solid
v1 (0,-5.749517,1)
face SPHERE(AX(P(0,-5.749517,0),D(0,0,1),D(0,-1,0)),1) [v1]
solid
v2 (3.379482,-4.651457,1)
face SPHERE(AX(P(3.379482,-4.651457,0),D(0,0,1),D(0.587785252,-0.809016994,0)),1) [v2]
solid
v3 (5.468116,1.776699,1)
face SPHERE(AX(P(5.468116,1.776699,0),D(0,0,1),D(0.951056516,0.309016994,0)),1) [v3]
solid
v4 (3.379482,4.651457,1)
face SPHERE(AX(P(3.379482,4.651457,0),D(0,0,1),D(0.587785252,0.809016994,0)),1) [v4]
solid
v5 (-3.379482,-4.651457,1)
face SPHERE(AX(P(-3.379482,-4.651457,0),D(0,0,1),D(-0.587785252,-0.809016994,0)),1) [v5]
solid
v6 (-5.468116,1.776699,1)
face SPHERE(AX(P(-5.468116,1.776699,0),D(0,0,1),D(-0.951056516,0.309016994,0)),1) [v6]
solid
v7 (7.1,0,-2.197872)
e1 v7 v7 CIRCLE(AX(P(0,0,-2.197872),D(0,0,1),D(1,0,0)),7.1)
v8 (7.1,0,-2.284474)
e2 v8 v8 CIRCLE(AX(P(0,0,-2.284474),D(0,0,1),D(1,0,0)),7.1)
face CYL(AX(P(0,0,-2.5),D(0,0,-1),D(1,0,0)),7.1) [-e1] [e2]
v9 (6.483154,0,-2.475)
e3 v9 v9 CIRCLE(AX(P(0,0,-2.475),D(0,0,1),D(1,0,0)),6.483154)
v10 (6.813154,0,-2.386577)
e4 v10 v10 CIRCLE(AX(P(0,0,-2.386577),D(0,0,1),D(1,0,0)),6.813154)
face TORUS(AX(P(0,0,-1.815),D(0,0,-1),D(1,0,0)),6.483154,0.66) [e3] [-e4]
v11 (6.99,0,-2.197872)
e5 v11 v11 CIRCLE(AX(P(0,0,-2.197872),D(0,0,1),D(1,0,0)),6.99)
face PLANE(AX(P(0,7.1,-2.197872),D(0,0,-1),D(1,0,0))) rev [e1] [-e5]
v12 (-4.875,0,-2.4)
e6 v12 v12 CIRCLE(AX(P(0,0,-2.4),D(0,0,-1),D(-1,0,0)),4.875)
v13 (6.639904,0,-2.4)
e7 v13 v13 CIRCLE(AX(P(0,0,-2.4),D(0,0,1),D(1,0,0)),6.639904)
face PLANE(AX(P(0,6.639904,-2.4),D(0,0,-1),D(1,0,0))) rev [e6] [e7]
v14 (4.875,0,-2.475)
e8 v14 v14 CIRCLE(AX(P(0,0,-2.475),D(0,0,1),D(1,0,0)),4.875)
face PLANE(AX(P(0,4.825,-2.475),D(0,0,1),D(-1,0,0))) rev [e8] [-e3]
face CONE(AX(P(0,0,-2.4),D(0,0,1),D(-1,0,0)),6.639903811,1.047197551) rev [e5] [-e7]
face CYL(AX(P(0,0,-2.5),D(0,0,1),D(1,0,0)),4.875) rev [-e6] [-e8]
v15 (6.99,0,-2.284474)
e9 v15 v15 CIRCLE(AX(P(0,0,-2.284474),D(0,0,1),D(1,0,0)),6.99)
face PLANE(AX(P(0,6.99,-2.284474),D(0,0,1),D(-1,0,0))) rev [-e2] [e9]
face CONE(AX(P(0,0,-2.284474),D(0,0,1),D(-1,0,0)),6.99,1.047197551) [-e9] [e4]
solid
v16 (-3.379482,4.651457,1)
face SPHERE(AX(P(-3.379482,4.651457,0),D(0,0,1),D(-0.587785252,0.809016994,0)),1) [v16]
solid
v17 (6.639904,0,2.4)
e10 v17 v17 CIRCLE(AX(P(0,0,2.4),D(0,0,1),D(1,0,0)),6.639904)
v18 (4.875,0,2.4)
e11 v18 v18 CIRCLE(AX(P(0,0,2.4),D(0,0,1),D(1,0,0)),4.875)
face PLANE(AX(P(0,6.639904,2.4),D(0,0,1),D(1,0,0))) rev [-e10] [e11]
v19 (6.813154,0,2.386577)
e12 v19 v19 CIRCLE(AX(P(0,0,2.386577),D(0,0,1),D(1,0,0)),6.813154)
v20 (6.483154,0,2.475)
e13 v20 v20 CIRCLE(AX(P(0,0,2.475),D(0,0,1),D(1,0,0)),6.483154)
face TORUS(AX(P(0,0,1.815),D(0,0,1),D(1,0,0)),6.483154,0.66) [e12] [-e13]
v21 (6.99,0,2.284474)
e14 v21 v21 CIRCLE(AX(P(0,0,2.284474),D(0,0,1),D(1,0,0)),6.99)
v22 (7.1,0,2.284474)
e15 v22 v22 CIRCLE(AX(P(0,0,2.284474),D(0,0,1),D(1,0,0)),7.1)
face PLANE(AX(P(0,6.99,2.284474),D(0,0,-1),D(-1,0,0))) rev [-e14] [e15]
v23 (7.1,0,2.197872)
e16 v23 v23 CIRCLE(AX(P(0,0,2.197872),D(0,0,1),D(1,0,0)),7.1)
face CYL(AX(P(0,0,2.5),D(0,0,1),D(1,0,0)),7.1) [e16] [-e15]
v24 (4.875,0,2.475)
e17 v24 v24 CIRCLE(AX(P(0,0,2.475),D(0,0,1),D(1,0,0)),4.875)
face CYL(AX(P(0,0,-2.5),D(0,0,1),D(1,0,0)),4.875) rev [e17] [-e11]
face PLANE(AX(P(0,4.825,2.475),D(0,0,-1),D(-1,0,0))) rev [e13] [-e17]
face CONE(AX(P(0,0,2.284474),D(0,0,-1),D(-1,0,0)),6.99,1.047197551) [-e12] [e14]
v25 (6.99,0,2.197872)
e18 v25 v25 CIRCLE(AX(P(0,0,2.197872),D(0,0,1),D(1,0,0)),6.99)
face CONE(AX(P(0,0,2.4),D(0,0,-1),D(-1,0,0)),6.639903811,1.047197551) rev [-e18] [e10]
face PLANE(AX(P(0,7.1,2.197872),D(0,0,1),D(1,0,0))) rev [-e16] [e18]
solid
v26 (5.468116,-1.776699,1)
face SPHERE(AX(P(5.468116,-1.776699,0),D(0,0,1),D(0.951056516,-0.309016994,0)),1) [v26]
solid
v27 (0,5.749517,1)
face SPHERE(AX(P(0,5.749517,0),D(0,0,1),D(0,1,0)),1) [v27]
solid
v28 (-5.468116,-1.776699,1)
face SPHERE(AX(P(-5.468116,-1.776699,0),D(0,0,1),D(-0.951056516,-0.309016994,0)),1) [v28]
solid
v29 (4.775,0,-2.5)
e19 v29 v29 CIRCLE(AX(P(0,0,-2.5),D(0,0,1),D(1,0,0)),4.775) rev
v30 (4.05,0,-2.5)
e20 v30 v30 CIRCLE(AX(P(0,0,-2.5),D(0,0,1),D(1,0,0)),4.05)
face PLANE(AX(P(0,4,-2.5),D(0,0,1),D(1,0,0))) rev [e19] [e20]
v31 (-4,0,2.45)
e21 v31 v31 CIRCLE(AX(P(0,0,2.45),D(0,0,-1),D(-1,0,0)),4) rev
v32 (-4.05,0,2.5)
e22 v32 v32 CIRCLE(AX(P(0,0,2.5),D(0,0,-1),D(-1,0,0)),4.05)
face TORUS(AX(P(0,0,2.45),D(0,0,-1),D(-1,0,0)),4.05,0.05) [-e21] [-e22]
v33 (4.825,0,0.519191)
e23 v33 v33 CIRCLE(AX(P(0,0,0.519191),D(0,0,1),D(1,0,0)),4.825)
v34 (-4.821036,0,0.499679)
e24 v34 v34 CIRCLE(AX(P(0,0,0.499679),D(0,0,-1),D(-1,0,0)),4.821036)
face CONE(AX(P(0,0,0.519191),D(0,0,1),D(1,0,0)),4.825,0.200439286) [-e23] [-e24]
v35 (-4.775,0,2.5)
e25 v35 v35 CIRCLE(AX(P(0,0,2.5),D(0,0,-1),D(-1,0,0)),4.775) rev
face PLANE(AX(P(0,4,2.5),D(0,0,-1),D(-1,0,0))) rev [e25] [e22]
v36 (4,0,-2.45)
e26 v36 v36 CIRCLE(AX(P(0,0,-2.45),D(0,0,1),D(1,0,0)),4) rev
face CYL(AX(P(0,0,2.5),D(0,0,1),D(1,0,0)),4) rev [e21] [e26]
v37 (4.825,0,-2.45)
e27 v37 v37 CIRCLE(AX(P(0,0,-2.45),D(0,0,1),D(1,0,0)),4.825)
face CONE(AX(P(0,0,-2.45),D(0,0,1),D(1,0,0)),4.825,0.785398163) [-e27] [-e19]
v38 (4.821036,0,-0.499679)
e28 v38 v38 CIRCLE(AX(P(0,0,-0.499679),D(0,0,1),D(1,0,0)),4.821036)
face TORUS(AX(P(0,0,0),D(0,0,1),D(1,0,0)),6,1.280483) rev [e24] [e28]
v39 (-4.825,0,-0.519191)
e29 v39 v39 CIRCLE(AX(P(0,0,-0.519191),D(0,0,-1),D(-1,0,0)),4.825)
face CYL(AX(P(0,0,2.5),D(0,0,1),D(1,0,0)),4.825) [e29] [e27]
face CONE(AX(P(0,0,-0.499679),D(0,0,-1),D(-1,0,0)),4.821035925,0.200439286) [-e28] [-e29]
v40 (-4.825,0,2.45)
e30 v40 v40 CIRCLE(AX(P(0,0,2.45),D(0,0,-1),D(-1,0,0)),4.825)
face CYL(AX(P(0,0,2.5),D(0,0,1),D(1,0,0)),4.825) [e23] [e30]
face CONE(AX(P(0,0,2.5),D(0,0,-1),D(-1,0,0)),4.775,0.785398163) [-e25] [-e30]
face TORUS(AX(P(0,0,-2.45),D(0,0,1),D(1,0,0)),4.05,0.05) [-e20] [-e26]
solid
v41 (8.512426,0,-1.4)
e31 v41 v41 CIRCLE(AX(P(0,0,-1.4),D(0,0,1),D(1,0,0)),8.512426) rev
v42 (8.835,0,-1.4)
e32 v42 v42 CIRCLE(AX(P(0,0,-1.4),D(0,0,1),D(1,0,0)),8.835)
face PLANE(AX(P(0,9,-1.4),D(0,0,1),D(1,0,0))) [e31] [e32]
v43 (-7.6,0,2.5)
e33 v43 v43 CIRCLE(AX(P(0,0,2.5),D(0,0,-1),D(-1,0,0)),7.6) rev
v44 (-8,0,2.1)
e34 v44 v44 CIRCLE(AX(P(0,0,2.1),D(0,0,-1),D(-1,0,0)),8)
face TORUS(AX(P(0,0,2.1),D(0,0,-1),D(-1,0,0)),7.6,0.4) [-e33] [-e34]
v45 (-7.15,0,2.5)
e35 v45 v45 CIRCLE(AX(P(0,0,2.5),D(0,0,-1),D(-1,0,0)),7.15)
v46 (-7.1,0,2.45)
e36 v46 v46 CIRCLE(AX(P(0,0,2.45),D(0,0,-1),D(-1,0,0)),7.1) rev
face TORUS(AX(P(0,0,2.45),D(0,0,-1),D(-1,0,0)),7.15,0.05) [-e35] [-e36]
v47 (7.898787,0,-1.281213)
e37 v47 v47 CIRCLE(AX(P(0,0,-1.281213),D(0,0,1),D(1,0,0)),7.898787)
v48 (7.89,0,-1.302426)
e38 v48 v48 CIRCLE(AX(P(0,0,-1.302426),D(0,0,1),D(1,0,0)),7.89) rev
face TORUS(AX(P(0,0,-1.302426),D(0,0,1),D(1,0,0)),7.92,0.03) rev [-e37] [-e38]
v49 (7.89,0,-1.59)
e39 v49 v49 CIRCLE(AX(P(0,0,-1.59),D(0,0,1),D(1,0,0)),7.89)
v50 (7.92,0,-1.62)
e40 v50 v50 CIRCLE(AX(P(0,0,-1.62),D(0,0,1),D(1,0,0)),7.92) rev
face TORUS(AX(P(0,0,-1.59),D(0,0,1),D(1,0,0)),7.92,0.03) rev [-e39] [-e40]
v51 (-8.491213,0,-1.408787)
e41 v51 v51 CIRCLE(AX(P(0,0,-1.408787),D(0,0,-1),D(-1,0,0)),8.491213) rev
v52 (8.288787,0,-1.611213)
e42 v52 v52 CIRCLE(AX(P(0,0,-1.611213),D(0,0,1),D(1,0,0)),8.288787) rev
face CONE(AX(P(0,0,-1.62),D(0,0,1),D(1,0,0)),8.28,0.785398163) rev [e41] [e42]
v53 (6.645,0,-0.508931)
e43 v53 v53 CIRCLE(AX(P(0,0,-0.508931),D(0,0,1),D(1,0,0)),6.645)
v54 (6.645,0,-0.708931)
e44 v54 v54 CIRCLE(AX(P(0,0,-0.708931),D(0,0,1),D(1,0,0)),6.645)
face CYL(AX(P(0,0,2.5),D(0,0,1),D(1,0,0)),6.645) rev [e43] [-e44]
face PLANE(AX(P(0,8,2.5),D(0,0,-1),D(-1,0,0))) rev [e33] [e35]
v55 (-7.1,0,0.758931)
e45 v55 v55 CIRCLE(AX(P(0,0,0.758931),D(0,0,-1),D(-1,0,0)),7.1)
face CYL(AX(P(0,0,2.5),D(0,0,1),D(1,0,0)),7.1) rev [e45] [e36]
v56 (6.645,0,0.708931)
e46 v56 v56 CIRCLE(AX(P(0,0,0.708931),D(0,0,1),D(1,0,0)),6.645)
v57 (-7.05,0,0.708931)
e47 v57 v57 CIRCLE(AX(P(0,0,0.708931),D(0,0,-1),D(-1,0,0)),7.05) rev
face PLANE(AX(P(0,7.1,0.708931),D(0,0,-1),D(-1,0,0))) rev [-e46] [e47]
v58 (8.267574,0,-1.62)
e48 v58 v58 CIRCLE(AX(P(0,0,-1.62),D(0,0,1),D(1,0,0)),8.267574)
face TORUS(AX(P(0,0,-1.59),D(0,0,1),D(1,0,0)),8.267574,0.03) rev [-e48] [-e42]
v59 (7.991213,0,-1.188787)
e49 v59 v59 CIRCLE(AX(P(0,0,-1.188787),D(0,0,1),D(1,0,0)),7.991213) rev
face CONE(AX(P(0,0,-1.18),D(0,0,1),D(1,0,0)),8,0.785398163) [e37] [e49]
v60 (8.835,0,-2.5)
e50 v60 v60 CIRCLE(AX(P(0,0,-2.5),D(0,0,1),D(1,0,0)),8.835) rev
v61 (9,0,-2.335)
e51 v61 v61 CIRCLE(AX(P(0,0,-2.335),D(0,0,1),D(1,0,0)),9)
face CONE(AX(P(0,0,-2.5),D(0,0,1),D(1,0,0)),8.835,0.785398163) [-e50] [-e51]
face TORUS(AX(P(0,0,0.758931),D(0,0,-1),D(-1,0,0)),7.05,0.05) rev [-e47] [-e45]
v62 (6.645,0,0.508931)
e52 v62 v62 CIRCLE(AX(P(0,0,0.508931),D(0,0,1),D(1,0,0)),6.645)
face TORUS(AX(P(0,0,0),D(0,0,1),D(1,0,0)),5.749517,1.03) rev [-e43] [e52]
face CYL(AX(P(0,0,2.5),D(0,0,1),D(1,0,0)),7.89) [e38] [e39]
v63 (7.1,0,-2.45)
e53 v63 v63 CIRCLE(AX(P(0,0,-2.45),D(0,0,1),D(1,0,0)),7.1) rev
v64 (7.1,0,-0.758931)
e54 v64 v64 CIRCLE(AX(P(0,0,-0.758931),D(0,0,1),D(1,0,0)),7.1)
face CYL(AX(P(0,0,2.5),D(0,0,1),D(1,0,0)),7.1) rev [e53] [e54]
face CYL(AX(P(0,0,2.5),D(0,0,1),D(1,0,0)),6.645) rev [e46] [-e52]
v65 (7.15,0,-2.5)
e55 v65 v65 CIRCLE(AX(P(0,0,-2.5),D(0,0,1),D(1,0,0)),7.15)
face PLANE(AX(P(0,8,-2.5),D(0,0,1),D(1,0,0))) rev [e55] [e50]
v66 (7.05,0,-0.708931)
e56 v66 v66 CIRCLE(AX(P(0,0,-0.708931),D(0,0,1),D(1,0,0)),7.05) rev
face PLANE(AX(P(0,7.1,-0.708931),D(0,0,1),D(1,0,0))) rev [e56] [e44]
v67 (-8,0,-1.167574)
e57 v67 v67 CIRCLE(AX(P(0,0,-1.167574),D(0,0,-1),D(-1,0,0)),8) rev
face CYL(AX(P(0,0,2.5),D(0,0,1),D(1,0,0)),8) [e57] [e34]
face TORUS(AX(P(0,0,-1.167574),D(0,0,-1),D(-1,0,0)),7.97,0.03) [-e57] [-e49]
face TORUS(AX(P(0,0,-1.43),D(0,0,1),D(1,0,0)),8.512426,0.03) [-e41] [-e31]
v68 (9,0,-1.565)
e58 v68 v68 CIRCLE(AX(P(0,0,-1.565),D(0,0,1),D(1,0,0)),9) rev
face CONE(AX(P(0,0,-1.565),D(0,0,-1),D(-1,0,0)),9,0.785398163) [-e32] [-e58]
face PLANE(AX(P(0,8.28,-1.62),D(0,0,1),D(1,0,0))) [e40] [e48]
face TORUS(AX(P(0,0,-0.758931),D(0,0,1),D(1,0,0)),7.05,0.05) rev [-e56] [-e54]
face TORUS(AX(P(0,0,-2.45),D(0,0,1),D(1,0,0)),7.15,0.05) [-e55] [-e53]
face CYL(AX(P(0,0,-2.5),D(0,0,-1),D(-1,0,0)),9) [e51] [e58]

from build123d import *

# Parameters (mm, degrees)
CIRPATTERN1_COUNT  = 10
SKETCH9_R          = 4.875
CUT_EXTRUDE1_DEPTH = 13.359232379
SKETCH7_W          = 1.1
SKETCH7_H          = 1.9
FILLET2_R          = 0.4
FILLET3_R          = 0.05
FILLET5_R          = 0.03
CHAMFER1_SIZE      = 0.165
FILLET7_R          = 0.05


with BuildPart() as part:
    # Sketch3 → Revolve1 (revolve)
    with BuildSketch(Plane(origin=(0, 0, 0), x_dir=(0, 0, -1), z_dir=(1, 0, 0)), mode=Mode.PRIVATE) as revolve1_sk:
        with BuildLine():
            Line((-2.5, 8), (-2.5, 7.1))
            Line((-2.5, 7.1), (-0.708931057, 7.1))
            Line((-0.708931057, 7.1), (-0.708931057, 6.645))
            Line((-0.708931057, 6.645), (-0.508931057, 6.645))
            ThreePointArc((-0.508931057, 6.645), (0, 6.779517348), (0.508931057, 6.645))
            Line((0.508931057, 6.645), (0.708931057, 6.645))
            Line((0.708931057, 6.645), (0.708931057, 7.1))
            Line((0.708931057, 7.1), (2.5, 7.1))
            Line((2.5, 7.1), (2.5, 8))
            Line((2.5, 8), (-2.5, 8))
        make_face()
        with BuildLine():
            Line((2.5, 4), (-2.5, 4))
            Line((-2.5, 4), (-2.5, 4.825))
            Line((-2.5, 4.825), (-0.508931057, 4.825))
            ThreePointArc((-0.508931057, 4.825), (0, 4.719517348), (0.508931057, 4.825))
            Line((0.508931057, 4.825), (2.5, 4.825))
            Line((2.5, 4.825), (2.5, 4))
        make_face()
    revolve(revolve1_sk.sketch.rotate(Axis((0, 0, 2.5), (0, 0, -1)), 90), axis=Axis((0, 0, 2.5), (0, 0, -1)))

    # Sketch7 → Revolve5 (revolve)
    with BuildSketch(Plane(origin=(0, 0, 0), x_dir=(0, 0, -1), z_dir=(1, 0, 0)), mode=Mode.PRIVATE) as revolve5_sk:
        with Locations((1.95, 8.05)):
            Rectangle(SKETCH7_W, SKETCH7_H)
    revolve(revolve5_sk.sketch.rotate(Axis((0, 0, -2.5), (0, 0, 1)), 270), axis=Axis((0, 0, -2.5), (0, 0, 1)))

    # Fillet2
    fillet2_edges = [part.edges().sort_by_distance(p)[0] for p in [
        (-8, 0, 2.5),
    ]]
    fillet(fillet2_edges, radius=FILLET2_R)

    # Fillet3
    fillet3_edges = [part.edges().sort_by_distance(p)[0] for p in [
        (-7.1, 0, 0.708931057),
        (-7.1, 0, 2.5),
        (-7.1, 0, -2.5),
        (-7.1, 0, -0.708931057),
    ]]
    fillet(fillet3_edges, radius=FILLET3_R)

    # Fillet6
    # the kernel refuses this chamfer: 0.05 mm, written as the material it takes off along each edge
    with BuildSketch(Plane(origin=(0, 0, 2.5), x_dir=(1, 0, 0), z_dir=(0, 1, 0))) as fillet6_piece_1:
        with BuildLine():
            Line((4.773585786, -0.001414214), (4.826414214, 0.051414214))
            Line((4.826414214, 0.051414214), (4.827414214, 0.051414214))
            ThreePointArc((4.827414214, 0.051414214), (4.826, 0.025707107), (4.826, 0))
            Line((4.826, 0), (4.825, -0.001))
            ThreePointArc((4.825, -0.001), (4.799292893, -0.001), (4.773585786, -0.002414214))
            Line((4.773585786, -0.002414214), (4.773585786, -0.001414214))
        make_face()
    revolve(axis=Axis((0, 0, 2.5), (0, 0, -1)), mode=Mode.SUBTRACT)
    with BuildSketch(Plane(origin=(0, 0, 0.508931057), x_dir=(1, 0, 0), z_dir=(0, 1, 0))) as fillet6_piece_2:
        with BuildLine():
            Line((4.8253982, -0.012219701), (4.820637726, 0.011211587))
            Line((4.820637726, 0.011211587), (4.821558444, 0.011601814))
            ThreePointArc((4.821558444, 0.011601814), (4.823542985, 0.005915405), (4.825917623, 0.000397453))
            Line((4.825917623, 0.000397453), (4.826, 0))
            ThreePointArc((4.826, 0), (4.826, -0.00610985), (4.8263982, -0.012219701))
            Line((4.8263982, -0.012219701), (4.8253982, -0.012219701))
        make_face()
    revolve(axis=Axis((0, 0, 0.508931057), (0, 0, -1)), mode=Mode.SUBTRACT)
    with BuildSketch(Plane(origin=(0, 0, -0.508931057), x_dir=(1, 0, 0), z_dir=(0, 1, 0))) as fillet6_piece_3:
        with BuildLine():
            Line((4.8253982, 0.012219701), (4.820637726, -0.011211587))
            Line((4.820637726, -0.011211587), (4.821558444, -0.011601814))
            ThreePointArc((4.821558444, -0.011601814), (4.823542985, -0.005915405), (4.825917623, -0.000397453))
            Line((4.825917623, -0.000397453), (4.826, 0))
            ThreePointArc((4.826, 0), (4.826, 0.00610985), (4.8263982, 0.012219701))
            Line((4.8263982, 0.012219701), (4.8253982, 0.012219701))
        make_face()
    revolve(axis=Axis((0, 0, -0.508931057), (0, 0, -1)), mode=Mode.SUBTRACT)
    with BuildSketch(Plane(origin=(0, 0, -2.5), x_dir=(1, 0, 0), z_dir=(0, 1, 0))) as fillet6_piece_4:
        with BuildLine():
            Line((4.826414214, -0.051414214), (4.773585786, 0.001414214))
            Line((4.773585786, 0.001414214), (4.773585786, 0.002414214))
            ThreePointArc((4.773585786, 0.002414214), (4.799292893, 0.001), (4.825, 0.001))
            Line((4.825, 0.001), (4.826, 0))
            ThreePointArc((4.826, 0), (4.826, -0.025707107), (4.827414214, -0.051414214))
            Line((4.827414214, -0.051414214), (4.826414214, -0.051414214))
        make_face()
    revolve(axis=Axis((0, 0, -2.5), (0, 0, -1)), mode=Mode.SUBTRACT)

    # Sketch8 → Cut-Revolve1 (revolve, cut)
    with BuildSketch(Plane(origin=(0, 0, 0), x_dir=(0, 0, -1), z_dir=(1, 0, 0)), mode=Mode.PRIVATE) as cut_revolve1_sk:
        Polygon((1.4, 8.5), (1.62, 8.28), (1.62, 7.89), (1.29, 7.89), (1.18, 8), (1.4, 8), align=None)
    revolve(cut_revolve1_sk.sketch.rotate(Axis((0, 0, 2.5), (0, 0, -1)), 270), axis=Axis((0, 0, 2.5), (0, 0, -1)), mode=Mode.SUBTRACT)

    # Fillet5
    fillet5_edges = [part.edges().sort_by_distance(p)[0] for p in [
        (8.5, 0, -1.4),
        (0, 8, -1.18),
        (7.89, 0, -1.29),
        (7.89, 0, -1.62),
        (8.28, 0, -1.62),
    ]]
    fillet(fillet5_edges, radius=FILLET5_R)

    # Chamfer1
    chamfer1_edges = [part.edges().sort_by_distance(p)[0] for p in [
        (-9, 0, -2.5),
        (-9, 0, -1.4),
    ]]
    chamfer(chamfer1_edges, length=CHAMFER1_SIZE)

    # Fillet7
    fillet7_edges = [part.edges().sort_by_distance(p)[0] for p in [
        (-4, 0, -2.5),
        (-4, 0, 2.5),
    ]]
    fillet(fillet7_edges, radius=FILLET7_R)


with BuildPart() as body_2:
    # Sketch5 → Revolve3 (revolve)
    with BuildSketch(Plane(origin=(0, 0, 0), x_dir=(0, 0, -1), z_dir=(1, 0, 0))):
        with BuildLine():
            Line((-1, 5.749517348), (1, 5.749517348))
            ThreePointArc((1, 5.749517348), (0, 6.749517348), (-1, 5.749517348))
        make_face()
    revolve(axis=Axis((0, 5.749517348, 1), (0, 0, -1)))


with BuildPart() as cirpattern1_1:
    # CirPattern1: pattern copy
    add(body_2.part.rotate(Axis((0, 0, 0), (0, 0, 1)), 1 * 360 / CIRPATTERN1_COUNT))


with BuildPart() as cirpattern1_2:
    # CirPattern1: pattern copy
    add(body_2.part.rotate(Axis((0, 0, 0), (0, 0, 1)), 2 * 360 / CIRPATTERN1_COUNT))


with BuildPart() as cirpattern1_3:
    # CirPattern1: pattern copy
    add(body_2.part.rotate(Axis((0, 0, 0), (0, 0, 1)), 3 * 360 / CIRPATTERN1_COUNT))


with BuildPart() as cirpattern1_4:
    # CirPattern1: pattern copy
    add(body_2.part.rotate(Axis((0, 0, 0), (0, 0, 1)), 4 * 360 / CIRPATTERN1_COUNT))


with BuildPart() as cirpattern1_5:
    # CirPattern1: pattern copy
    add(body_2.part.rotate(Axis((0, 0, 0), (0, 0, 1)), 5 * 360 / CIRPATTERN1_COUNT))


with BuildPart() as cirpattern1_6:
    # CirPattern1: pattern copy
    add(body_2.part.rotate(Axis((0, 0, 0), (0, 0, 1)), 6 * 360 / CIRPATTERN1_COUNT))


with BuildPart() as cirpattern1_7:
    # CirPattern1: pattern copy
    add(body_2.part.rotate(Axis((0, 0, 0), (0, 0, 1)), 7 * 360 / CIRPATTERN1_COUNT))


with BuildPart() as cirpattern1_8:
    # CirPattern1: pattern copy
    add(body_2.part.rotate(Axis((0, 0, 0), (0, 0, 1)), 8 * 360 / CIRPATTERN1_COUNT))


with BuildPart() as cirpattern1_9:
    # CirPattern1: pattern copy
    add(body_2.part.rotate(Axis((0, 0, 0), (0, 0, 1)), 9 * 360 / CIRPATTERN1_COUNT))


with BuildPart() as body_12:
    # Sketch6 → Revolve4 (revolve)
    with BuildSketch(Plane(origin=(0, 0, 0), x_dir=(0, 0, -1), z_dir=(1, 0, 0)), mode=Mode.PRIVATE) as revolve4_sk:
        with BuildLine():
            Line((-2.475, 4.825), (-2.475, 6.483153533))
            ThreePointArc((-2.475, 6.483153533), (-2.452511045, 6.653974103), (-2.386576766, 6.813153533))
            Line((-2.386576766, 6.813153533), (-2.284474411, 6.99))
            Line((-2.284474411, 6.99), (-2.284474411, 7.1))
            Line((-2.284474411, 7.1), (-2.197871871, 7.1))
            Line((-2.197871871, 7.1), (-2.197871871, 6.99))
            Line((-2.197871871, 6.99), (-2.4, 6.639903811))
            Line((-2.4, 6.639903811), (-2.4, 4.825))
            Line((-2.4, 4.825), (-2.475, 4.825))
        make_face()
    revolve(revolve4_sk.sketch.rotate(Axis((0, 0, 2.5), (0, 0, -1)), 90), axis=Axis((0, 0, 2.5), (0, 0, -1)))


with BuildPart() as body_13:
    # Mirror1: mirrored copy
    add(body_12.part.mirror(Plane.XY))


with BuildPart() as cut_extrude1_tool:
    # Sketch9 → Cut-Extrude1 (new, through all)
    with BuildSketch(Plane.XY.offset(2.475)):
        Circle(SKETCH9_R)
    extrude(amount=-CUT_EXTRUDE1_DEPTH)


with BuildPart() as body_12_1:
    add(body_12.part)

    # Cut-Extrude1: cut by cut_extrude1_tool
    add(cut_extrude1_tool.part, mode=Mode.SUBTRACT)


with BuildPart() as body_13_1:
    add(body_13.part)

    # Cut-Extrude1: cut by cut_extrude1_tool
    add(cut_extrude1_tool.part, mode=Mode.SUBTRACT)


solid = Compound([part.part, body_2.part, cirpattern1_1.part, cirpattern1_2.part, cirpattern1_3.part, cirpattern1_4.part, cirpattern1_5.part, cirpattern1_6.part, cirpattern1_7.part, cirpattern1_8.part, cirpattern1_9.part, body_12_1.part, body_13_1.part])
